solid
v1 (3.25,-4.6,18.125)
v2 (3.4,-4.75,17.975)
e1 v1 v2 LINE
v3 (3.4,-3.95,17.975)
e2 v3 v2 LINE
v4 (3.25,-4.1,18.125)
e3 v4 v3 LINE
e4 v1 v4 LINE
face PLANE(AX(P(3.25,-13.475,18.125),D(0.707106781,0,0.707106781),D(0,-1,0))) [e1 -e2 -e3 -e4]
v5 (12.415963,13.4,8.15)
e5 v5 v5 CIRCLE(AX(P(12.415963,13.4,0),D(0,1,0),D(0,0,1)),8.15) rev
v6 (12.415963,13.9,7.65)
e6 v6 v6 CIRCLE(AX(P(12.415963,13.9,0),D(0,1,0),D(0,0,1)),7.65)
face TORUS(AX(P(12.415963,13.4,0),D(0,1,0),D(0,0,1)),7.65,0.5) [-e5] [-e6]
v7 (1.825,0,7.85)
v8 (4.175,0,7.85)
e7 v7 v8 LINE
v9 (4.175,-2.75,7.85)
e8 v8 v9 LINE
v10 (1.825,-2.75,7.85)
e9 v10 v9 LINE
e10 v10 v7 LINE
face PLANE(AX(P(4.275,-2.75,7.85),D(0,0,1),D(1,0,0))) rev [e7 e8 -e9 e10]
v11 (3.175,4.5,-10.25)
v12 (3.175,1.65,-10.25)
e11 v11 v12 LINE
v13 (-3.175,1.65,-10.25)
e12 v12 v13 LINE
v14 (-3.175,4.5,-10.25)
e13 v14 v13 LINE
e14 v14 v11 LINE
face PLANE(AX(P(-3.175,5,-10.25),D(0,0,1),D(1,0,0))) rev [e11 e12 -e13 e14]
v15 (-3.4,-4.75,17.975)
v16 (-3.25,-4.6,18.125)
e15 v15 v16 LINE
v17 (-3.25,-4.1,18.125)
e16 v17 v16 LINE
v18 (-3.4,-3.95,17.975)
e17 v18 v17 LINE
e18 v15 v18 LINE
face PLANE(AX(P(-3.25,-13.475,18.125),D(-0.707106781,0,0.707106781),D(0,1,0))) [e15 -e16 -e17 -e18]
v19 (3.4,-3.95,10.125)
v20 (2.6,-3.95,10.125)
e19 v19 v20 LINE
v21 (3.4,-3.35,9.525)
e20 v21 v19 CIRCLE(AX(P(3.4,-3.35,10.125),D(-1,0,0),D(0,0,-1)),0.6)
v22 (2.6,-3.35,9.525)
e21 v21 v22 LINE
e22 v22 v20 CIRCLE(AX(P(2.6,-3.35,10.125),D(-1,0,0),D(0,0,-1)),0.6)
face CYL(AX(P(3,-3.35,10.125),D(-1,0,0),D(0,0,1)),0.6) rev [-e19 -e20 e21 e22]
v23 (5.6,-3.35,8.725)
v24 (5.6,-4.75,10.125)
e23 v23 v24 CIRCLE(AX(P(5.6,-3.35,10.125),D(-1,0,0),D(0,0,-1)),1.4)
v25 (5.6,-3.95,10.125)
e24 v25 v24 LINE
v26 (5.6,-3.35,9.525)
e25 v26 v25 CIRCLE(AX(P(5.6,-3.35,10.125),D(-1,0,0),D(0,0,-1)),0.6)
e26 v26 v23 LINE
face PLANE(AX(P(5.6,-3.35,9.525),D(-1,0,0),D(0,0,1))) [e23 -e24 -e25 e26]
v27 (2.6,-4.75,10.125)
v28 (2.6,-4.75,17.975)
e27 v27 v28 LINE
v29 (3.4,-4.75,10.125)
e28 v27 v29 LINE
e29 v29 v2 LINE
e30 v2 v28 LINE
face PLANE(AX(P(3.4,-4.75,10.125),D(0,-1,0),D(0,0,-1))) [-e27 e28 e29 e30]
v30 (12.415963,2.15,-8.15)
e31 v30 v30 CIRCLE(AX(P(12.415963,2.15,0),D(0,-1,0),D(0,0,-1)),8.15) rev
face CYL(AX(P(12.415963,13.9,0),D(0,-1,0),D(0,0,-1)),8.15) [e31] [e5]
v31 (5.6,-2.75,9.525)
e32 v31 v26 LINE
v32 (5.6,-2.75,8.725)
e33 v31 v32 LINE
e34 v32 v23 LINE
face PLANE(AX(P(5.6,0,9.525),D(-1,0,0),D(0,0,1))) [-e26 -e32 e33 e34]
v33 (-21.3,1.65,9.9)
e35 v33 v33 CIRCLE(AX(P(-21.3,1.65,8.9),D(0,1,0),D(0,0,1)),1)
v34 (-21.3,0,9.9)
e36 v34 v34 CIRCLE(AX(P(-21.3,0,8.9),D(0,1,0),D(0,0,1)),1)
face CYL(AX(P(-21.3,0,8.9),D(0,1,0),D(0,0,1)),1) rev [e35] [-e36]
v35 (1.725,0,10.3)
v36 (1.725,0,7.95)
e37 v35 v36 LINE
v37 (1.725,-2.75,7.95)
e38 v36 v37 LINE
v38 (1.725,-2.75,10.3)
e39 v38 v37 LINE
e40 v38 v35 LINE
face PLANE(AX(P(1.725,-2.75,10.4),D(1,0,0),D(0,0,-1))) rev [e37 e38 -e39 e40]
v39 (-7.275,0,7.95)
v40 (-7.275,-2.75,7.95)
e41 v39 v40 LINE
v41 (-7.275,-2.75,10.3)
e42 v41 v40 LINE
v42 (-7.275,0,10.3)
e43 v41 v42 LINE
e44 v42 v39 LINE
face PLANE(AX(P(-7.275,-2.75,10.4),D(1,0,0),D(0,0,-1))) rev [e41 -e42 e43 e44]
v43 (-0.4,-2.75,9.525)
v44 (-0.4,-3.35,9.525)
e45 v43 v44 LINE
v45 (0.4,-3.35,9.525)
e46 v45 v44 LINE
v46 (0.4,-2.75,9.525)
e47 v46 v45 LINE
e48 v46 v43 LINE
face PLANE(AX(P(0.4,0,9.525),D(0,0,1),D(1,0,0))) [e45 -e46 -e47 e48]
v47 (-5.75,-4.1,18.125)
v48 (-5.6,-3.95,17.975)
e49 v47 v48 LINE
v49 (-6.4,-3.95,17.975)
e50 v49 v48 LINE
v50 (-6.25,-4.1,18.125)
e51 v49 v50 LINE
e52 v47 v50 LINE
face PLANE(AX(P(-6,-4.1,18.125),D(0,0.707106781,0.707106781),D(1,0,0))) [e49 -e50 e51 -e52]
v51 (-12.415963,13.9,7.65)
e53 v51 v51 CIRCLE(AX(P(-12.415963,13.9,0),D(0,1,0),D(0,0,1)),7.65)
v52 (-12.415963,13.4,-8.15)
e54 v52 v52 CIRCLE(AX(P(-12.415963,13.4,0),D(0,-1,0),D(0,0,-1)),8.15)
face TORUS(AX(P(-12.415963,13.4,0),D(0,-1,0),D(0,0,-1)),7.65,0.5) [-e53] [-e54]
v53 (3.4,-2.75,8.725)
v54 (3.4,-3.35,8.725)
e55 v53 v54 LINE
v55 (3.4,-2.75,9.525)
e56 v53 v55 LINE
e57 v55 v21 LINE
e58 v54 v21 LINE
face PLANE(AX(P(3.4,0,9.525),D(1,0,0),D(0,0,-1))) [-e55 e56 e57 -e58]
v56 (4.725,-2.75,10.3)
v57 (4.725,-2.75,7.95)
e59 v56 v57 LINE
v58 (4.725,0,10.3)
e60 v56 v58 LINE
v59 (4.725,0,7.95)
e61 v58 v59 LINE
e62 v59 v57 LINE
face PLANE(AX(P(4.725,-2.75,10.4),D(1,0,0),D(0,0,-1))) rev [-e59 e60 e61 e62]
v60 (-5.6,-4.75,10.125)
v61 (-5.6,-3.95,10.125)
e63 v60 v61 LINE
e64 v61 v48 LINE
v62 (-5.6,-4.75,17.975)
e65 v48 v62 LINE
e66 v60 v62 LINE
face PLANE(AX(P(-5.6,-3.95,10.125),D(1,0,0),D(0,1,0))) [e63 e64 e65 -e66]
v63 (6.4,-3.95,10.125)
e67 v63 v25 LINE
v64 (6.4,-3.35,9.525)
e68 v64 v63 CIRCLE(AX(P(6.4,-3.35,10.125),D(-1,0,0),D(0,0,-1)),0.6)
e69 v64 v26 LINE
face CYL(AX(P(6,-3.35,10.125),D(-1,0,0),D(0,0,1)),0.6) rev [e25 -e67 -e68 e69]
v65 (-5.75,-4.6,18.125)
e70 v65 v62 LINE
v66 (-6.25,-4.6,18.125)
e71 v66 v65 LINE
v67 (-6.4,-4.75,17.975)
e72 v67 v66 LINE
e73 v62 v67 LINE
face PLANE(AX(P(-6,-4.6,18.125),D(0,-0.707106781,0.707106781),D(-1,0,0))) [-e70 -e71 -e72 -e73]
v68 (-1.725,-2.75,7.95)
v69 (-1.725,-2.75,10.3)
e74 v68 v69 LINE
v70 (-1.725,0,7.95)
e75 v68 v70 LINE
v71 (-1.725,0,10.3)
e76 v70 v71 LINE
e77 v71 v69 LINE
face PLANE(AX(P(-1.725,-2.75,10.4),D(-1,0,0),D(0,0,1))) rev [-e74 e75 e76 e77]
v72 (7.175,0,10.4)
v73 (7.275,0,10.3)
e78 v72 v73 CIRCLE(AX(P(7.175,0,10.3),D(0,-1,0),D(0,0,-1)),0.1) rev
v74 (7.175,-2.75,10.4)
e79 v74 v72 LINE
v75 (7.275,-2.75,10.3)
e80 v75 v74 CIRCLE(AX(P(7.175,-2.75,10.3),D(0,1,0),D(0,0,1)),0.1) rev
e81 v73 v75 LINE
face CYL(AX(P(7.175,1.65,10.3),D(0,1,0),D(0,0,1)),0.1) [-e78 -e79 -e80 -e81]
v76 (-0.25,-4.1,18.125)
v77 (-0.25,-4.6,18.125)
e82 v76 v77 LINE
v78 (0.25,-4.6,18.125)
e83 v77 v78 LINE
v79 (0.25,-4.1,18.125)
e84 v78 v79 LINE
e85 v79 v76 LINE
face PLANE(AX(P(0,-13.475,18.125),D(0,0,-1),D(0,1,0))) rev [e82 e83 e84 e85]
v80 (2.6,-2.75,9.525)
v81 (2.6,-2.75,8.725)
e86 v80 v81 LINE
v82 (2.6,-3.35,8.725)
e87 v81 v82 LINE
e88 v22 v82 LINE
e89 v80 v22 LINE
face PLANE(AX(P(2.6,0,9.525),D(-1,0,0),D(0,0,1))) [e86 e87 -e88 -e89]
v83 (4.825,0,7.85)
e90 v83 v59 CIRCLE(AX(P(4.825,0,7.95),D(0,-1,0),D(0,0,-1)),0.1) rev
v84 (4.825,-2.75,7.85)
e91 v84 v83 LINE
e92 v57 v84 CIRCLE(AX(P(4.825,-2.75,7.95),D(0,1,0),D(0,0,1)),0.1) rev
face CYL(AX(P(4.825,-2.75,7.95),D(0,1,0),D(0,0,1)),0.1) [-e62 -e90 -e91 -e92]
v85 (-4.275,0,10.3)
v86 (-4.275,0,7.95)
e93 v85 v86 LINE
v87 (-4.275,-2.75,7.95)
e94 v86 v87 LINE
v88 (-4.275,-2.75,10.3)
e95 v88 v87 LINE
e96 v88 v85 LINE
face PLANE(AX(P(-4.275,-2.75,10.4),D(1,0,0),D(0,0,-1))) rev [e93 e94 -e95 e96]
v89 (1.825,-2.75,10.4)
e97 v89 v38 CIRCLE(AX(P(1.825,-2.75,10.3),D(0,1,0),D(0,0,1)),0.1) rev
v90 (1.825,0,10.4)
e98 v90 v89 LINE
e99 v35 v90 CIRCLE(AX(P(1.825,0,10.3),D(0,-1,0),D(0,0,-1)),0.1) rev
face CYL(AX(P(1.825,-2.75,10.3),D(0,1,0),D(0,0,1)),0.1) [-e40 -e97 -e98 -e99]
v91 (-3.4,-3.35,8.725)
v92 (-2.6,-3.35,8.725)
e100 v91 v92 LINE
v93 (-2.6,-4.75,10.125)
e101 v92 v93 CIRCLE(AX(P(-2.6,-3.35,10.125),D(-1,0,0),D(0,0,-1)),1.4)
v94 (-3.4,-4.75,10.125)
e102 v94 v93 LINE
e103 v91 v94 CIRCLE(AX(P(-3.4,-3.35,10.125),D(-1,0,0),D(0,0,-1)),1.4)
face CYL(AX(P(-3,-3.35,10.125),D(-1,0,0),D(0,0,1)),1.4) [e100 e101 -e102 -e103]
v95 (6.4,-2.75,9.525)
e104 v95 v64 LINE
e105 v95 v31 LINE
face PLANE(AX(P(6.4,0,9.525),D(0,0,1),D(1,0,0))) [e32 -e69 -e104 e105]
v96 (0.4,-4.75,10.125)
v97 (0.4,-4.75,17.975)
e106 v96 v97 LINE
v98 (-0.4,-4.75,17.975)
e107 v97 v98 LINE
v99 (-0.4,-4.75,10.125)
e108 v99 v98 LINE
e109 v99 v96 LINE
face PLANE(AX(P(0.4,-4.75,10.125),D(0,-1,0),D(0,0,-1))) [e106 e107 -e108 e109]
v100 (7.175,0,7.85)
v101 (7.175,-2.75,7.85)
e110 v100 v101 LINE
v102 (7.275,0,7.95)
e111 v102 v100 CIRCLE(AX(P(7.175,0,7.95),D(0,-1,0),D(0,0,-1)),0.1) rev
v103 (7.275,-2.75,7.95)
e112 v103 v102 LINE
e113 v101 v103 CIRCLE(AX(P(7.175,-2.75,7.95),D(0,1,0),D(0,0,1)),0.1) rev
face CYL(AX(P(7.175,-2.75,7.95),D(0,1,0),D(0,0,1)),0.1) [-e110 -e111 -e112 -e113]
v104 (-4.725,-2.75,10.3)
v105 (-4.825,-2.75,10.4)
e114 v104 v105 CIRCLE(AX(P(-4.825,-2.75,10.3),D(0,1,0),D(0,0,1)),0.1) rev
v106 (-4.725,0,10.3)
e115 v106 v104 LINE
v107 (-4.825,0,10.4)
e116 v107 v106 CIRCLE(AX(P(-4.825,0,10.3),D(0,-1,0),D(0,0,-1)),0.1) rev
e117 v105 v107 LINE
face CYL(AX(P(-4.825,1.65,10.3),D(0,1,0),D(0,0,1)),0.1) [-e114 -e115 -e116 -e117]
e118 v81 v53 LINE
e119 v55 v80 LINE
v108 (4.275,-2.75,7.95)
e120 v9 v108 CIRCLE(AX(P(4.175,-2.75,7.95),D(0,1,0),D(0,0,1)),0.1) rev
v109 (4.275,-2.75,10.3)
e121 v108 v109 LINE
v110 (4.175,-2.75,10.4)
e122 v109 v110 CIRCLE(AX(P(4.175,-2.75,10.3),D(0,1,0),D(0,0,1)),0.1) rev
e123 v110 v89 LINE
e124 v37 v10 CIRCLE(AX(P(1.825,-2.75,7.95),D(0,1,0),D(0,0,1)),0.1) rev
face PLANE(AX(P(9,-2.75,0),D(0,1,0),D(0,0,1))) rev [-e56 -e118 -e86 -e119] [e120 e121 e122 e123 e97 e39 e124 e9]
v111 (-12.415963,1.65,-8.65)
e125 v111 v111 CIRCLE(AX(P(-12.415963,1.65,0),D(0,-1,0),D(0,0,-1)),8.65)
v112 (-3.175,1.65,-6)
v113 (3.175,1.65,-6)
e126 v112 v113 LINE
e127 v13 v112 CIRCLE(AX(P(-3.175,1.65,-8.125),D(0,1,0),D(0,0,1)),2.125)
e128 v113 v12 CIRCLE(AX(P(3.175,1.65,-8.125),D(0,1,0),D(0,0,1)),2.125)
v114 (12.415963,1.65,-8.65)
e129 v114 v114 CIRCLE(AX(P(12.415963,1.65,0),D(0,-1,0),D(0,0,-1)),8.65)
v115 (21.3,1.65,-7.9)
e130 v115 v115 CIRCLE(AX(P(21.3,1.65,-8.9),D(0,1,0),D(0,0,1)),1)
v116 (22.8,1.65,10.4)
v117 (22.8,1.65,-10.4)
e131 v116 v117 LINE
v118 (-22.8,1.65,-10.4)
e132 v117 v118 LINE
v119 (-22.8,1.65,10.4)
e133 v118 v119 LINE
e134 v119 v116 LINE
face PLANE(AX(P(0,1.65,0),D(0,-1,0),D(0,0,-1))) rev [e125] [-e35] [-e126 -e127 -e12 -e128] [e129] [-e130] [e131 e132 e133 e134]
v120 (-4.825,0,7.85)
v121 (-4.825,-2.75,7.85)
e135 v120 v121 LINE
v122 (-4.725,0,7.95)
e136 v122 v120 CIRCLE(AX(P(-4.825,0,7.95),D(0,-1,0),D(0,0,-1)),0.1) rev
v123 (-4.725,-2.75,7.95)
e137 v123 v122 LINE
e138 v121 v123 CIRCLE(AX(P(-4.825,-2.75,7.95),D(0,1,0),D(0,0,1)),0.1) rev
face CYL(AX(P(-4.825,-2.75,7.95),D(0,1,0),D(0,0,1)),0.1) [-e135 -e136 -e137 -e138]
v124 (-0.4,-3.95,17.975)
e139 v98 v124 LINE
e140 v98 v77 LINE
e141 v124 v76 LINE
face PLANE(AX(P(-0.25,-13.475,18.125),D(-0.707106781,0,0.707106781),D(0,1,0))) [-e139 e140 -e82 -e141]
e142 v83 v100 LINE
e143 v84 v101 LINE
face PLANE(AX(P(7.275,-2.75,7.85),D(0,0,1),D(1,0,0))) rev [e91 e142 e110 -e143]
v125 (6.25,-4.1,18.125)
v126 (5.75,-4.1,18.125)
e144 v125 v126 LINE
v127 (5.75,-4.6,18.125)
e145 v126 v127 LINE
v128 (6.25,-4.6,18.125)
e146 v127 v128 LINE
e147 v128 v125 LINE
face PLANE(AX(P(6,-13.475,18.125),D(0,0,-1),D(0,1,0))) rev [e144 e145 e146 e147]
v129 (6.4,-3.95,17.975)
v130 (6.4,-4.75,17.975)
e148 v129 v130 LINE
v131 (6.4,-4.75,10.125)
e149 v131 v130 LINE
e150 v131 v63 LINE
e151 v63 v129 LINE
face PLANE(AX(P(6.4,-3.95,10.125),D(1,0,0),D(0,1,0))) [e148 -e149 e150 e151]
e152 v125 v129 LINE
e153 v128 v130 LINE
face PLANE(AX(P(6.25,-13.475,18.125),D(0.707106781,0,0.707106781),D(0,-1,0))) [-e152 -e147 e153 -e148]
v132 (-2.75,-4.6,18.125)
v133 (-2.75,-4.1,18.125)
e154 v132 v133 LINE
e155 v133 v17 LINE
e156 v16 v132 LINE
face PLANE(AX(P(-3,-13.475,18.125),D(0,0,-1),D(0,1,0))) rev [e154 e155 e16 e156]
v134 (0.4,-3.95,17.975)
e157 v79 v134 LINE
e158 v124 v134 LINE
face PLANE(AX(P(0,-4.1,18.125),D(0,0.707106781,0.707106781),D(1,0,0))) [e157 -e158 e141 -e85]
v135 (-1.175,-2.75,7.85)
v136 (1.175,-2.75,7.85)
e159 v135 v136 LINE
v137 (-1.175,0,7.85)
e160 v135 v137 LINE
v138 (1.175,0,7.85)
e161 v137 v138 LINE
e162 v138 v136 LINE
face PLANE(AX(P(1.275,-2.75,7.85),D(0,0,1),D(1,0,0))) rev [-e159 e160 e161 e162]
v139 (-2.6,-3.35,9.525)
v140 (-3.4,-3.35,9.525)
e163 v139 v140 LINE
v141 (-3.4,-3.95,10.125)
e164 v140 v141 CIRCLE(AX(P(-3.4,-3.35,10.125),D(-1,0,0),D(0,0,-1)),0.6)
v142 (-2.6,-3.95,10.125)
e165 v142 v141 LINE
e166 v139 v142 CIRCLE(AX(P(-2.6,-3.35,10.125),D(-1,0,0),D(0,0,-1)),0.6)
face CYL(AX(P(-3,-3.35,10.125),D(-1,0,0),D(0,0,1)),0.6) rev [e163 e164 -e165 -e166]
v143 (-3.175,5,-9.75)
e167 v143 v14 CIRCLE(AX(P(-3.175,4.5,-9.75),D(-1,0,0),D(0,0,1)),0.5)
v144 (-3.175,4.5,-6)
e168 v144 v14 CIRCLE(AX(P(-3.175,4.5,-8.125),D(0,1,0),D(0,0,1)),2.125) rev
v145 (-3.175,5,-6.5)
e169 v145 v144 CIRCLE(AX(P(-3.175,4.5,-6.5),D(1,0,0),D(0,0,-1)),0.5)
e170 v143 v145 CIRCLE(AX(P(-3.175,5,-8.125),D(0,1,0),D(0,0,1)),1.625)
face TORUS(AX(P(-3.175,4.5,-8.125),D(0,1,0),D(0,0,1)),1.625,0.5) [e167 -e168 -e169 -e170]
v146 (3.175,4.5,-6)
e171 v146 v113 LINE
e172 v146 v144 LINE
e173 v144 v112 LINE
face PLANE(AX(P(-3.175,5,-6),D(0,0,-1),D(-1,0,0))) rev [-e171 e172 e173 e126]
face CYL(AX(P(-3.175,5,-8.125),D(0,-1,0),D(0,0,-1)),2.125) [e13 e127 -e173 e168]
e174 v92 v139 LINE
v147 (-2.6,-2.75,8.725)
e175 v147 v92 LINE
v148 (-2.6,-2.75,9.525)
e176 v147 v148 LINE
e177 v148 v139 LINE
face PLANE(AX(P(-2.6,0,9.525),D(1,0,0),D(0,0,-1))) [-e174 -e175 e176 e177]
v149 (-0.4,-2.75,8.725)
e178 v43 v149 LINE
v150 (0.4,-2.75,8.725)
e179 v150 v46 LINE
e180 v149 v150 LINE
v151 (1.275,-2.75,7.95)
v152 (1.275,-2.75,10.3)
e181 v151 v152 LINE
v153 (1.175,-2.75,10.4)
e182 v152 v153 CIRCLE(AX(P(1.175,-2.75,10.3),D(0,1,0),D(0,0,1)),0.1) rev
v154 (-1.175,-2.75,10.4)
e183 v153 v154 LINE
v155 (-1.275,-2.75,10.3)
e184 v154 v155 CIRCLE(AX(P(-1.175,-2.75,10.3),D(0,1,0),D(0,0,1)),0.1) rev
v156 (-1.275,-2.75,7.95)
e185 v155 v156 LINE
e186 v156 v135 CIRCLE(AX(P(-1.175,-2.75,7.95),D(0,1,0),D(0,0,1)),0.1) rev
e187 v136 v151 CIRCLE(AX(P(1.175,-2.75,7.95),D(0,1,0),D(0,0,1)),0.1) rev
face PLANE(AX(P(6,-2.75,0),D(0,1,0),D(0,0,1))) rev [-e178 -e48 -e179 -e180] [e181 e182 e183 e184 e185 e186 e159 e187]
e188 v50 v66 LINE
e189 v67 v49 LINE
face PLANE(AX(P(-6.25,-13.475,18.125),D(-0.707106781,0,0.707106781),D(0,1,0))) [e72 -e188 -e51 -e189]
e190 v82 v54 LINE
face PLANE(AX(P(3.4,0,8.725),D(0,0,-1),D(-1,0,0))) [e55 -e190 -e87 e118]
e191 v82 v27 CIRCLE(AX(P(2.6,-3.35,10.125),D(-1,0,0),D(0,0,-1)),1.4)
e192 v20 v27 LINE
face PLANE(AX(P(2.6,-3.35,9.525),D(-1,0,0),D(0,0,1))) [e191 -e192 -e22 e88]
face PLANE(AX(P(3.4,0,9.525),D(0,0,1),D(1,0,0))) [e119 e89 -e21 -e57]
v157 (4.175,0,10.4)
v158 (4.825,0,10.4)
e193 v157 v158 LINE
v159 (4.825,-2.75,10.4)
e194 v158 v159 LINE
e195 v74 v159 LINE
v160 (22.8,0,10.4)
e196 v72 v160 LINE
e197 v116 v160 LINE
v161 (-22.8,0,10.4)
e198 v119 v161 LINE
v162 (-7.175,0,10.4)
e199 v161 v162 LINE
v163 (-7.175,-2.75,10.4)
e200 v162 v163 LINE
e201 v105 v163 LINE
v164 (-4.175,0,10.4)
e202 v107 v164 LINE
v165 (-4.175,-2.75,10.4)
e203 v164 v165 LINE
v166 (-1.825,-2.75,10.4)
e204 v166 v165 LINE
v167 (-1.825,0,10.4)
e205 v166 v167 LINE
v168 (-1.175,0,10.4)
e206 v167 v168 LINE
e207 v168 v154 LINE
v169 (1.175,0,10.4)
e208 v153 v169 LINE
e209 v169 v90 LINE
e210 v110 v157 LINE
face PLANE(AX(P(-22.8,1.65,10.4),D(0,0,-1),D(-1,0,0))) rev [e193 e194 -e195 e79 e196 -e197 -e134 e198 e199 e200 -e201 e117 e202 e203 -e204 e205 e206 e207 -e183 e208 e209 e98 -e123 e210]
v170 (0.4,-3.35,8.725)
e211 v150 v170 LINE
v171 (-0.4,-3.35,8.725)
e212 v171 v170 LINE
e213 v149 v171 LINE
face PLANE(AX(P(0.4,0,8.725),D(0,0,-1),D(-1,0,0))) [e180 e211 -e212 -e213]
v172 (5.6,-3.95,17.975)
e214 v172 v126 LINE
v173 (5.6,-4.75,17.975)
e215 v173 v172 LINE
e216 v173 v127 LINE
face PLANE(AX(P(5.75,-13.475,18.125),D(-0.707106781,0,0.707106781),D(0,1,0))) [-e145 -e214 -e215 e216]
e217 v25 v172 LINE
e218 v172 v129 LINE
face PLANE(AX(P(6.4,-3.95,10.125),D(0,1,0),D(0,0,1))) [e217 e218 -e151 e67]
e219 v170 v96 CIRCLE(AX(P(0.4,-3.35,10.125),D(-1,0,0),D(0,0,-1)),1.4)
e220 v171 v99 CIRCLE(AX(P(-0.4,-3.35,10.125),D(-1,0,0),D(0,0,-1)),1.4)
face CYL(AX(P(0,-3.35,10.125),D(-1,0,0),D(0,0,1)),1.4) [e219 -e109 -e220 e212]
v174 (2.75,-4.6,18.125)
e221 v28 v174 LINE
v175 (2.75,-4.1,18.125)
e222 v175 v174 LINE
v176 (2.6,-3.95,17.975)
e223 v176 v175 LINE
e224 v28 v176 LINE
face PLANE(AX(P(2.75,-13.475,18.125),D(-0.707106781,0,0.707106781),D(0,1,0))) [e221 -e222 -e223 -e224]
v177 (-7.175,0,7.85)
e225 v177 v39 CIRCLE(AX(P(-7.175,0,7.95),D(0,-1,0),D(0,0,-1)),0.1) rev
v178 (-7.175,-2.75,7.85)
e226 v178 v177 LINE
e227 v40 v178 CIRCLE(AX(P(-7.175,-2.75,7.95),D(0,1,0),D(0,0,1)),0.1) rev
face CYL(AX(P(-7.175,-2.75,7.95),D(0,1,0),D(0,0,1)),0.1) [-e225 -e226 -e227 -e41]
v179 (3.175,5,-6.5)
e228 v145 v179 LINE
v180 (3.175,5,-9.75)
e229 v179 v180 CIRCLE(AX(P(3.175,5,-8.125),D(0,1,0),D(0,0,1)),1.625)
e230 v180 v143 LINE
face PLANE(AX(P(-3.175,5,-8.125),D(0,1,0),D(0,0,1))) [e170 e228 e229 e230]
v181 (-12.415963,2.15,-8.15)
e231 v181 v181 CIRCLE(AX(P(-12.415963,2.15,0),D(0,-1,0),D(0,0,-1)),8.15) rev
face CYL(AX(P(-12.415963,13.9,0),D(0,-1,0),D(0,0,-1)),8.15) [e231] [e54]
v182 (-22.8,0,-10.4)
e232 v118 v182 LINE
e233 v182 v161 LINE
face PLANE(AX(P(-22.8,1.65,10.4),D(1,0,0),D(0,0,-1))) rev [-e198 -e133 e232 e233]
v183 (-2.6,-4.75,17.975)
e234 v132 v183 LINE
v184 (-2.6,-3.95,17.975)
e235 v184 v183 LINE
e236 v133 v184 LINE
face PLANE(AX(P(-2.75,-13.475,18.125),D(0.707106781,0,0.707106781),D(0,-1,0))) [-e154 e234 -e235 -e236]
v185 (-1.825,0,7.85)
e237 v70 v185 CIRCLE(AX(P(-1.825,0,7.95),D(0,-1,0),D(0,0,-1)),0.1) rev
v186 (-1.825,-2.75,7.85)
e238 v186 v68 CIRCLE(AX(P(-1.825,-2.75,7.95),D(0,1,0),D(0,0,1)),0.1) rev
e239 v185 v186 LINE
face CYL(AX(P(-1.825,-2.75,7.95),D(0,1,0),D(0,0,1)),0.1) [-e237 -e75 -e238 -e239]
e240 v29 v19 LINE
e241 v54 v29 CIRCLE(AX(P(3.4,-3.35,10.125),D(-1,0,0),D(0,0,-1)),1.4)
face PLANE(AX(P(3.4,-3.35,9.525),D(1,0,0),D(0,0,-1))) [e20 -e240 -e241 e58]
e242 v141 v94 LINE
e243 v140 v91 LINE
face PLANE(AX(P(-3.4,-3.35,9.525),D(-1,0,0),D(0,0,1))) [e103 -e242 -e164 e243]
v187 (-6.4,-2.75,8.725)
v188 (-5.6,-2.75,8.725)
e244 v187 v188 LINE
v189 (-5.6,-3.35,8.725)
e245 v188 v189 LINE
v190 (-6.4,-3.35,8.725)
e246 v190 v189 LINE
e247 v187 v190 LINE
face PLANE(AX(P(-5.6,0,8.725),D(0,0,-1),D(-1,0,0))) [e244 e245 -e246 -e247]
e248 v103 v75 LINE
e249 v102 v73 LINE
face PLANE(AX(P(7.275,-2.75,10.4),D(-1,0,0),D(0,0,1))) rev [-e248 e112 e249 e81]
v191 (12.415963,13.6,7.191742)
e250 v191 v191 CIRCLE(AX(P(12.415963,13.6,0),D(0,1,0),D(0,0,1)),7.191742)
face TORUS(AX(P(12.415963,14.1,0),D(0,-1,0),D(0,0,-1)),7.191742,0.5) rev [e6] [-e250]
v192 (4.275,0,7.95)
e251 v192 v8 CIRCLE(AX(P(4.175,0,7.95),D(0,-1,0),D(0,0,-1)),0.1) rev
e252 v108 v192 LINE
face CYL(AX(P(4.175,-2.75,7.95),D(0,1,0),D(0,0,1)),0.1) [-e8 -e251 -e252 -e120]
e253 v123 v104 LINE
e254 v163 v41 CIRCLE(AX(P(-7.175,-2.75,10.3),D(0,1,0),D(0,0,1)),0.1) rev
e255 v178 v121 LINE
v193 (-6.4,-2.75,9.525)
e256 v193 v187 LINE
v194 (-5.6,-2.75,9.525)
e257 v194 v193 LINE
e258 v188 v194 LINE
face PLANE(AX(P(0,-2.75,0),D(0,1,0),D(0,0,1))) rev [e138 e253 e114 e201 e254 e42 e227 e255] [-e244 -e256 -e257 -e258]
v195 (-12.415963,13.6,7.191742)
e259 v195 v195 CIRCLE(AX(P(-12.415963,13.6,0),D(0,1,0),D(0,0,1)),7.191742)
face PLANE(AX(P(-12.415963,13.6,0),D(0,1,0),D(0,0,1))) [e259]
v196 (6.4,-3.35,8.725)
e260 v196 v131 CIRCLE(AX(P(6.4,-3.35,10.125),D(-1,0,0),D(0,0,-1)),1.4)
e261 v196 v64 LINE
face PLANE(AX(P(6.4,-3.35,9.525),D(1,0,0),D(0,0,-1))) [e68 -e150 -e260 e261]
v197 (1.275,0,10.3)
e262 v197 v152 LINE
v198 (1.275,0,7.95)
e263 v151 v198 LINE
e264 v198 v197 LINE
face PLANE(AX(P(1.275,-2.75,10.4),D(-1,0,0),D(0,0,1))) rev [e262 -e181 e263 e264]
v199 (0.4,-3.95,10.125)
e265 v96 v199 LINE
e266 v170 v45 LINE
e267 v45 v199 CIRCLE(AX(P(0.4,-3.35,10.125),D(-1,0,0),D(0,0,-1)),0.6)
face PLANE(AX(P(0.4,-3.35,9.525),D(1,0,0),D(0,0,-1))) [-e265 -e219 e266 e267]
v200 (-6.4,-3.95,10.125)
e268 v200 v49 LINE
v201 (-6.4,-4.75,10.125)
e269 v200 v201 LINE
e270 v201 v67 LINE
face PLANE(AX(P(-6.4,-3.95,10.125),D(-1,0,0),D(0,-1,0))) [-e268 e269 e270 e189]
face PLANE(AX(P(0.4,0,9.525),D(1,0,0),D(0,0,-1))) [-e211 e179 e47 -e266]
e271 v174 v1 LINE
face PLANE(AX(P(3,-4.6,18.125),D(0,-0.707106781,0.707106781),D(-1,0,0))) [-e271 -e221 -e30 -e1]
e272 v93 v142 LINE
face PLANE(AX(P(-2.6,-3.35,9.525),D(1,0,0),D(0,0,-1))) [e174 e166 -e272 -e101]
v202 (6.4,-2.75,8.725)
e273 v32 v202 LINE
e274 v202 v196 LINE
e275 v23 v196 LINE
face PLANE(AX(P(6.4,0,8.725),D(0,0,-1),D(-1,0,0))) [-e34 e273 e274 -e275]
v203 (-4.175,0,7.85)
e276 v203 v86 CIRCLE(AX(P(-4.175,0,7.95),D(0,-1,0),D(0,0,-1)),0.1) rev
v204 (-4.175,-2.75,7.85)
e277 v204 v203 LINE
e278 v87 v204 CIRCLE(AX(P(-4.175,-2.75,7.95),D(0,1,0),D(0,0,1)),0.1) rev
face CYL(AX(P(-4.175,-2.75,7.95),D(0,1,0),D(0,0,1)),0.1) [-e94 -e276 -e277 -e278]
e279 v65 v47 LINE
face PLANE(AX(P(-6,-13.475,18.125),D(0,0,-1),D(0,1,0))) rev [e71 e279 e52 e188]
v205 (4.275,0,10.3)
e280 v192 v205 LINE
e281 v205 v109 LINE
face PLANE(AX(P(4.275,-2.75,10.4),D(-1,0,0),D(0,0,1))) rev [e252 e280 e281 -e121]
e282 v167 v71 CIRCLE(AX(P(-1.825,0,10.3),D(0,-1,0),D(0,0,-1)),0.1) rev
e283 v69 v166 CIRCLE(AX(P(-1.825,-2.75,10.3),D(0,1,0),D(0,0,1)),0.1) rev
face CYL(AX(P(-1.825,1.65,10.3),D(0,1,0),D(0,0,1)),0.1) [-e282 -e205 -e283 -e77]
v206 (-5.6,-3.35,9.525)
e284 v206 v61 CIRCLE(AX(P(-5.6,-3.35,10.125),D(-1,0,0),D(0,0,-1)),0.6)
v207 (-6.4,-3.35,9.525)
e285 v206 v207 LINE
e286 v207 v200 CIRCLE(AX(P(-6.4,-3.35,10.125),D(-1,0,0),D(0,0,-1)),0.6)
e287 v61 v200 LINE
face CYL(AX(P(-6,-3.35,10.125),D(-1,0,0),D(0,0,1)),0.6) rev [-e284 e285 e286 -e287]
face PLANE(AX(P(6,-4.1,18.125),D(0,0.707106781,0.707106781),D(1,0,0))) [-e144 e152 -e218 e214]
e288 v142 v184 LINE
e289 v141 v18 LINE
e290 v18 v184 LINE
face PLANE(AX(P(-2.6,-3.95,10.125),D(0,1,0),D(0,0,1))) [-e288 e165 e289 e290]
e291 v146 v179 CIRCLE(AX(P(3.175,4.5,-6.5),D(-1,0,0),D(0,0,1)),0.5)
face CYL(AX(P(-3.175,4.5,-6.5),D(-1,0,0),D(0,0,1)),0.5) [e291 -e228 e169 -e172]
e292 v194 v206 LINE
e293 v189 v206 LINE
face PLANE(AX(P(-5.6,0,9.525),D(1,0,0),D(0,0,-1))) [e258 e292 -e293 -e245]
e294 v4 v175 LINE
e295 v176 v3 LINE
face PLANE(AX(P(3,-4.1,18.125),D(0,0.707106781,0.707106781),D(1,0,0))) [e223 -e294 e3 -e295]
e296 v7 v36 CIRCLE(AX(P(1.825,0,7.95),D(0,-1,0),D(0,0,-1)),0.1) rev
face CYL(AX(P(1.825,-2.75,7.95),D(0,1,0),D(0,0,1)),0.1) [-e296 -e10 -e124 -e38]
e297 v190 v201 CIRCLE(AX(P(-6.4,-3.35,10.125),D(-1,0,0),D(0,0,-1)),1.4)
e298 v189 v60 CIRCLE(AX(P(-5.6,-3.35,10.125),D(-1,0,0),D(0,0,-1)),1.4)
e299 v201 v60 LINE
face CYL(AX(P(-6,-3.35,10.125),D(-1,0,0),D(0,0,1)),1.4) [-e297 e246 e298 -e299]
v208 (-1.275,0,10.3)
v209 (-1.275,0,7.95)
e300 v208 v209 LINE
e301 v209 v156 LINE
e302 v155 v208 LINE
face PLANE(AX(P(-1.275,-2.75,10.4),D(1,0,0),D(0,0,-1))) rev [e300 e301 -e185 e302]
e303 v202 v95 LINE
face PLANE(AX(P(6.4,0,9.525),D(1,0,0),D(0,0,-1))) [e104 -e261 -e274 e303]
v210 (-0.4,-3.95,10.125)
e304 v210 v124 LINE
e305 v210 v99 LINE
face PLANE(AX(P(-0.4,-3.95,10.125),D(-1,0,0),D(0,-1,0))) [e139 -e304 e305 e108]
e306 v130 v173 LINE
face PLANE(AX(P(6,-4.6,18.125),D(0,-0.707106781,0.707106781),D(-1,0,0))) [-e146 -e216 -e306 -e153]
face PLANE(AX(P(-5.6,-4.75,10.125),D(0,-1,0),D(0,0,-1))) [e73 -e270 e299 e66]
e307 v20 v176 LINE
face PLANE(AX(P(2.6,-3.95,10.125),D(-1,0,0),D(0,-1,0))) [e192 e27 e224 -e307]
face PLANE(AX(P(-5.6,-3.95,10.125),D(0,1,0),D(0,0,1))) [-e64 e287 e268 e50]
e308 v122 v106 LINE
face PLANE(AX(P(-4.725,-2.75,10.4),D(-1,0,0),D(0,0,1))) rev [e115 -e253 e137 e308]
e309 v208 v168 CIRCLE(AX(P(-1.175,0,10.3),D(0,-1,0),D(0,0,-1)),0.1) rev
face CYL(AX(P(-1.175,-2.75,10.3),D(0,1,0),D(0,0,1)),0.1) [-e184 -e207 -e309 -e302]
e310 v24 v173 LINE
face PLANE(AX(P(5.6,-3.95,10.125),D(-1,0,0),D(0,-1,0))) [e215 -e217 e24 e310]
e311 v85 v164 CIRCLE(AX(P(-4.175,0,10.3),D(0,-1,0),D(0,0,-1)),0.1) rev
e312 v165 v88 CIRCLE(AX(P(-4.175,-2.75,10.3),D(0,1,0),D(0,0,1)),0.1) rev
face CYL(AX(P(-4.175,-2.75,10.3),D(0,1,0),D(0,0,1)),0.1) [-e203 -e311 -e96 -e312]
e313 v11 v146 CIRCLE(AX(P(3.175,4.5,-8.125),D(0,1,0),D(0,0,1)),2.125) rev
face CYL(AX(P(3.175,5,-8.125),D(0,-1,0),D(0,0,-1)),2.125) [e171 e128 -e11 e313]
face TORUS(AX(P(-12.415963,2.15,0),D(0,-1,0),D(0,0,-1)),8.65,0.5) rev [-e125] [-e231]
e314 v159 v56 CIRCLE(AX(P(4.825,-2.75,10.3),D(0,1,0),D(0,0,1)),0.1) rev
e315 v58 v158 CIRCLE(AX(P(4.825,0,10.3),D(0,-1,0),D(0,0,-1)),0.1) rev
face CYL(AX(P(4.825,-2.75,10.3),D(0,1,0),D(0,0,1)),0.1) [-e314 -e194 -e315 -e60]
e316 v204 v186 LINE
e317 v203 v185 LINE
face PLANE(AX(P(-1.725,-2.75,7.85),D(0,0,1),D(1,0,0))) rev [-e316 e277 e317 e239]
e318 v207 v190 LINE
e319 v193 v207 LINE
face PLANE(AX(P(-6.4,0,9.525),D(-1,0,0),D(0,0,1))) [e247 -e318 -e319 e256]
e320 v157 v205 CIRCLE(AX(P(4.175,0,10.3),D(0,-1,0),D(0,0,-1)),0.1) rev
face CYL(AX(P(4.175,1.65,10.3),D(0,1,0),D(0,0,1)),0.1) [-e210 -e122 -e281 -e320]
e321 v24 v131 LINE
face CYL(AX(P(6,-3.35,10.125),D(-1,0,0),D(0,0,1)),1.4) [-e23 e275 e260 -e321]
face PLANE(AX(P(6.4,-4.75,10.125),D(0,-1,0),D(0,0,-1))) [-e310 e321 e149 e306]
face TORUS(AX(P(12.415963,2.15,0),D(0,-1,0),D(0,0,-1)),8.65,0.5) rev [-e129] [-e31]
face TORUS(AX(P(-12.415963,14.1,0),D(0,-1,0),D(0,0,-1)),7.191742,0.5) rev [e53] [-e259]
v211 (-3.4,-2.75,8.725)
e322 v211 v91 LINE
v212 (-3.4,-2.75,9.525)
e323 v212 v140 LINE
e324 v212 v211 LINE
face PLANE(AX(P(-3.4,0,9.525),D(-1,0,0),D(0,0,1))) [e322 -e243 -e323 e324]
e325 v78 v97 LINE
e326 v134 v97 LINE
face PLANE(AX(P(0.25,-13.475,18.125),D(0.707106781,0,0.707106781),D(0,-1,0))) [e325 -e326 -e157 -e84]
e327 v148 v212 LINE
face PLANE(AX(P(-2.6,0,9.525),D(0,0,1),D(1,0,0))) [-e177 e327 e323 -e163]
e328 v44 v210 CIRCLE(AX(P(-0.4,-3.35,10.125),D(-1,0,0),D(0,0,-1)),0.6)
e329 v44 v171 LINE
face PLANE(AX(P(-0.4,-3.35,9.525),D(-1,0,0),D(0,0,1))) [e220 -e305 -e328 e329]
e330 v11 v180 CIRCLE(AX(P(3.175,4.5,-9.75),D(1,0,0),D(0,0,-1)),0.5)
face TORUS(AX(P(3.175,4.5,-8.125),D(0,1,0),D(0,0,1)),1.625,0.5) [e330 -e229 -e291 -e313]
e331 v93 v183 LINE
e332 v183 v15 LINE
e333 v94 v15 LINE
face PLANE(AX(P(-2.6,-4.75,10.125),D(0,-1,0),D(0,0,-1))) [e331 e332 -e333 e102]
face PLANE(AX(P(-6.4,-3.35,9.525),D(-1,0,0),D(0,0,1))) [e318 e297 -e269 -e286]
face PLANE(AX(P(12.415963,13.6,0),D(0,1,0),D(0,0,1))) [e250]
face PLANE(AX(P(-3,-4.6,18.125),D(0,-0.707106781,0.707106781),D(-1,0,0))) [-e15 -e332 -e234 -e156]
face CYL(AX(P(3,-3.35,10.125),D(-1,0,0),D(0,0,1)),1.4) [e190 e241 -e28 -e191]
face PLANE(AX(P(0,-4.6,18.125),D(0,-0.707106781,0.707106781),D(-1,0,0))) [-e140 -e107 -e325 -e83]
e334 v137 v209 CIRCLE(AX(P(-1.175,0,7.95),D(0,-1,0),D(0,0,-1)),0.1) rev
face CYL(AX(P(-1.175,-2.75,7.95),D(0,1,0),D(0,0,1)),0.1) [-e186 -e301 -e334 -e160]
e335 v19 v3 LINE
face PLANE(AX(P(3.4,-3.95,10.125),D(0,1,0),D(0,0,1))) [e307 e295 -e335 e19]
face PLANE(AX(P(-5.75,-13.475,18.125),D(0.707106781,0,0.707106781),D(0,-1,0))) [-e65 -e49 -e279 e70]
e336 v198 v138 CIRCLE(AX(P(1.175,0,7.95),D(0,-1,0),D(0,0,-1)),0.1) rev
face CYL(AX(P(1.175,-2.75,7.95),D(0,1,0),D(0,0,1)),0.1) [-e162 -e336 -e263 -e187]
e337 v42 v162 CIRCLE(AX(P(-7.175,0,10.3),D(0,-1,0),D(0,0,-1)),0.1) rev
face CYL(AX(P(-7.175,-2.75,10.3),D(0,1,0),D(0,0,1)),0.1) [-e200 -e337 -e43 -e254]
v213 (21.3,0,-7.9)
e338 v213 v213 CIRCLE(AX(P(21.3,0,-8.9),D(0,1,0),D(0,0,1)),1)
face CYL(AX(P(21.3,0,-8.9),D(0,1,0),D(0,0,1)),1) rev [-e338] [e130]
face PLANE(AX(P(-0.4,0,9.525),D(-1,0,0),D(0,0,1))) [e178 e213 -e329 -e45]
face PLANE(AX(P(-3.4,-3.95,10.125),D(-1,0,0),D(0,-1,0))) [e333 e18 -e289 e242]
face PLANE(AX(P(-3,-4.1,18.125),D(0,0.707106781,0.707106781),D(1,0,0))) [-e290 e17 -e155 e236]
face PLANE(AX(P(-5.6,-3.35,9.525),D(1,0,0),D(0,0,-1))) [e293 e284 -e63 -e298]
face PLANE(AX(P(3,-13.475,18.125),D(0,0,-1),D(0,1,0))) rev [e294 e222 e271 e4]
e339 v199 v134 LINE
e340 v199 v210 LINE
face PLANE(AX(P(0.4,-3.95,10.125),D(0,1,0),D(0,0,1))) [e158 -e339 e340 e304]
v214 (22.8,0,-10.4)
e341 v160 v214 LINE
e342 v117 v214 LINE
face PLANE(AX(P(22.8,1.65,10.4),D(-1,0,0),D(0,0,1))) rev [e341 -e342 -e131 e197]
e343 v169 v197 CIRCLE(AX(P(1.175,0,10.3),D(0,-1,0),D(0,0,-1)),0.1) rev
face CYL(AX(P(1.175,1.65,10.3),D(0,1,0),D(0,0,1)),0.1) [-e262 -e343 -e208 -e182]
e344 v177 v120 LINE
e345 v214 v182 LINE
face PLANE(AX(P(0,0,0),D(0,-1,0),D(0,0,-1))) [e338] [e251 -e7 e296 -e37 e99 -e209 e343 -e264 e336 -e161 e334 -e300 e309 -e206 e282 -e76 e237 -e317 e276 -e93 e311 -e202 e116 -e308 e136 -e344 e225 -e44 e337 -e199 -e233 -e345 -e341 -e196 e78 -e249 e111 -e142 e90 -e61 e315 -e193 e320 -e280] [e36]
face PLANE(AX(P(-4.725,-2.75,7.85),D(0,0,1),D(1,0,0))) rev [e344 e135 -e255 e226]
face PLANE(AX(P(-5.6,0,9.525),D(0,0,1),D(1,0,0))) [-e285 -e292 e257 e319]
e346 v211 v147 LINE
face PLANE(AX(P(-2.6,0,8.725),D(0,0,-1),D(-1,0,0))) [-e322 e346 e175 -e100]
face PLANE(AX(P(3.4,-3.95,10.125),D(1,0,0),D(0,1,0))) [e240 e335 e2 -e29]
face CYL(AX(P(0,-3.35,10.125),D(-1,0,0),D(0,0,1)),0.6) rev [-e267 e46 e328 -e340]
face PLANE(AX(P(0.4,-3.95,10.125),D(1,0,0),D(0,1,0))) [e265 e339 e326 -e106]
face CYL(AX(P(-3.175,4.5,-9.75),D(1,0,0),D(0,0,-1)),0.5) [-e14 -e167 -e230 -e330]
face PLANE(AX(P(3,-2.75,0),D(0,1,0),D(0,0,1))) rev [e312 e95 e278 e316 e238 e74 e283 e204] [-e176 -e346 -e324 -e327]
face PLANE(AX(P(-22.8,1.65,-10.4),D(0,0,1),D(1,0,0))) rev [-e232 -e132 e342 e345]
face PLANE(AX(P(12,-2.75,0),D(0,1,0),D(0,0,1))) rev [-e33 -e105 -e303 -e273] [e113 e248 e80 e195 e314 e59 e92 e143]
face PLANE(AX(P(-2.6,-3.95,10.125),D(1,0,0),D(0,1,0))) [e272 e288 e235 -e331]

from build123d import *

# Parameters (mm, degrees)
SKETCH1_W                  = 45.6
SKETCH1_H                  = 20.8
BOSS_EXTRUDE1_DEPTH        = 1.65
BOSS_EXTRUDE2_DEPTH        = 3.35
FILLET1_R                  = 0.5
SKETCH4_R                  = 8.15
BOSS_EXTRUDE3_DEPTH        = 12.25
FILLET2_R                  = 0.5
SKETCH6_R                  = 7.65
CUT_EXTRUDE1_DEPTH         = 0.3
FILLET3_R                  = 0.5
SKETCH7_R                  = 1
CUT_EXTRUDE2_DEPTH         = 28.893771706
SKETCH9_W                  = 0.8
SKETCH9_H                  = 0.8
CHAMFER1_SIZE              = 0.15
LPATTERN3_COUNT            = 3
LPATTERN3_PITCH            = 3
CHAMFER1_OF_LPATTERN3_SIZE = 0.15
LPATTERN4_COUNT            = 3
LPATTERN4_PITCH            = 3
CHAMFER1_OF_LPATTERN4_SIZE = 0.15
SKETCH10_W                 = 2.55
SKETCH10_H                 = 2.55
BOSS_EXTRUDE4_DEPTH        = 2.75
FILLET4_R                  = 0.1
LPATTERN5_COUNT            = 5
LPATTERN5_PITCH            = 3
FILLET4_OF_LPATTERN5_R     = 0.1


with BuildPart() as part:
    # Sketch1 → Boss-Extrude1 (new body)
    with BuildSketch(Plane(origin=(0, 0, 0), x_dir=(1, 0, 0), z_dir=(0, 1, 0))):
        Rectangle(SKETCH1_W, SKETCH1_H)
    extrude(amount=BOSS_EXTRUDE1_DEPTH)

    # Sketch2 → Boss-Extrude2 (add)
    with BuildSketch(Plane(origin=(0, 1.65, 0), x_dir=(1, 0, 0), z_dir=(0, 1, 0))):
        with BuildLine():
            Line((-3.175, 10.25), (3.175, 10.25))
            ThreePointArc((3.175, 10.25), (5.3, 8.125), (3.175, 6))
            Line((3.175, 6), (-3.175, 6))
            ThreePointArc((-3.175, 6), (-5.3, 8.125), (-3.175, 10.25))
        make_face()
    extrude(amount=BOSS_EXTRUDE2_DEPTH)

    # Fillet1
    fillet1_edges = [part.edges().sort_by_distance(p)[0] for p in [
        (-5.3, 5, -8.125),
        (0, 5, -6),
        (5.3, 5, -8.125),
        (0, 5, -10.25),
    ]]
    fillet(fillet1_edges, radius=FILLET1_R)

    # Sketch4 → Boss-Extrude3 (add)
    with BuildSketch(Plane(origin=(0, 1.65, 0), x_dir=(1, 0, 0), z_dir=(0, 1, 0))):
        with Locations(Location((12.415962636, 0, 0), (0, 0, 90))):
            Circle(SKETCH4_R)
        with Locations(Location((-12.415962636, 0, 0), (0, 0, 90))):
            Circle(SKETCH4_R)
    extrude(amount=BOSS_EXTRUDE3_DEPTH)

    # Fillet2
    fillet2_edges = [part.edges().sort_by_distance(p)[0] for p in [
        (12.415962636, 1.65, 8.15),
        (12.415962636, 13.9, 8.15),
        (-12.415962636, 1.65, 8.15),
        (-12.415962636, 13.9, 8.15),
    ]]
    fillet(fillet2_edges, radius=FILLET2_R)

    # Sketch6 → Cut-Extrude1 (cut)
    with BuildSketch(Plane(origin=(0, 13.9, 0), x_dir=(1, 0, 0), z_dir=(0, 1, 0))):
        with Locations(Location((12.415962636, 0, 0), (0, 0, 270))):
            Circle(SKETCH6_R)
        with Locations(Location((-12.415962636, 0, 0), (0, 0, 270))):
            Circle(SKETCH6_R)
    extrude(amount=-CUT_EXTRUDE1_DEPTH, mode=Mode.SUBTRACT)

    # Fillet3
    # the kernel refuses this fillet: 0.5 mm, written as the material it adds along each edge
    with BuildSketch(Plane(origin=(12.415962636, 13.6, 0), x_dir=(0, 0, 1), z_dir=(-1, 0, 0))) as fillet3_piece_1:
        with BuildLine():
            CenterArc((7.191742431, 0.5), FILLET3_R, 270, 66.421821522)
            Line((7.191742431, 0), (7.191742431, -0.01))
            Line((7.191742431, -0.01), (7.65, -0.01))
            Line((7.65, -0.01), (7.66, 0))
            ThreePointArc((7.66, 0), (7.66, 0.15), (7.659165151, 0.296))
            Line((7.659165151, 0.296), (7.65, 0.3))
        make_face()
    revolve(axis=Axis((12.415962636, 13.6, 0), (0, 1, 0)), revolution_arc=179.999999776)
    with BuildSketch(Plane(origin=(12.415962636, 13.6, 0), x_dir=(3.90111484147698e-09, 0, -1.0), z_dir=(1.0, 0, 3.90111484147698e-09))) as fillet3_piece_2:
        with BuildLine():
            CenterArc((7.191742431, 0.5), FILLET3_R, 270, 66.421821522)
            Line((7.191742431, 0), (7.191742431, -0.01))
            Line((7.191742431, -0.01), (7.65, -0.01))
            Line((7.65, -0.01), (7.66, 0))
            ThreePointArc((7.66, 0), (7.66, 0.15), (7.659165151, 0.296))
            Line((7.659165151, 0.296), (7.65, 0.3))
        make_face()
    revolve(axis=Axis((12.415962636, 13.6, 0), (0, 1, 0)), revolution_arc=180.000000224)
    with BuildSketch(Plane(origin=(-12.415962636, 13.6, 0), x_dir=(0, 0, 1), z_dir=(-1, 0, 0))) as fillet3_piece_3:
        with BuildLine():
            CenterArc((7.191742431, 0.5), FILLET3_R, 270, 66.421821522)
            Line((7.191742431, 0), (7.191742431, -0.01))
            Line((7.191742431, -0.01), (7.65, -0.01))
            Line((7.65, -0.01), (7.66, 0))
            ThreePointArc((7.66, 0), (7.66, 0.15), (7.659165151, 0.296))
            Line((7.659165151, 0.296), (7.65, 0.3))
        make_face()
    revolve(axis=Axis((-12.415962636, 13.6, 0), (0, 1, 0)), revolution_arc=179.999999776)
    with BuildSketch(Plane(origin=(-12.415962636, 13.6, 0), x_dir=(3.901114841476977e-09, 0, -1.0), z_dir=(1.0, 0, 3.901114841476977e-09))) as fillet3_piece_4:
        with BuildLine():
            CenterArc((7.191742431, 0.5), FILLET3_R, 270, 66.421821522)
            Line((7.191742431, 0), (7.191742431, -0.01))
            Line((7.191742431, -0.01), (7.65, -0.01))
            Line((7.65, -0.01), (7.66, 0))
            ThreePointArc((7.66, 0), (7.66, 0.15), (7.659165151, 0.296))
            Line((7.659165151, 0.296), (7.65, 0.3))
        make_face()
    revolve(axis=Axis((-12.415962636, 13.6, 0), (0, 1, 0)), revolution_arc=180.000000224)

    # Sketch7 → Cut-Extrude2 (cut, through all)
    with BuildSketch(Plane(origin=(0, 1.65, 0), x_dir=(1, 0, 0), z_dir=(0, 1, 0))):
        with Locations(Location((-21.3, -8.9, 0), (0, 0, 270))):
            Circle(SKETCH7_R)
        with Locations(Location((21.3, 8.9, 0), (0, 0, 270))):
            Circle(SKETCH7_R)
    extrude(amount=-CUT_EXTRUDE2_DEPTH, mode=Mode.SUBTRACT)

    # Sweep1: sweep along a path in Sketch8
    with BuildLine(Plane(origin=(0, 0, 0), x_dir=(0, 0, -1), z_dir=(1, 0, 0))) as sweep1_path:
        Line((-9.125, 0), (-9.125, -3.35))
        ThreePointArc((-9.125, -3.35), (-9.417893219, -4.057106781), (-10.125, -4.35))
        Line((-10.125, -4.35), (-18.125, -4.35))
    # Sketch9 → Sweep1 (sweep)
    with BuildSketch(Plane.XZ):
        with Locations((0, 9.125)):
            Rectangle(SKETCH9_W, SKETCH9_H)
    sweep1 = sweep(path=sweep1_path.line)

    # Chamfer1
    chamfer1_edges = [part.edges().sort_by_distance(p)[0] for p in [
        (-0.4, -4.35, 18.125),
        (0, -4.75, 18.125),
        (0.4, -4.35, 18.125),
        (0, -3.95, 18.125),
    ]]
    chamfer(chamfer1_edges, length=CHAMFER1_SIZE)

    # LPattern3: Sweep1 ×3
    with Locations(*[(-i * LPATTERN3_PITCH, 0, 0) for i in range(1, LPATTERN3_COUNT)]):
        add(sweep1)

    # Chamfer1 of LPattern3
    chamfer1_of_lpattern3_edges = [part.edges().sort_by_distance(p)[0] for p in [
        (-3.4, -4.35, 18.125),
        (-3, -4.75, 18.125),
        (-2.6, -4.35, 18.125),
        (-3, -3.95, 18.125),
        (-6.4, -4.35, 18.125),
        (-6, -4.75, 18.125),
        (-5.6, -4.35, 18.125),
        (-6, -3.95, 18.125),
    ]]
    chamfer(chamfer1_of_lpattern3_edges, length=CHAMFER1_OF_LPATTERN3_SIZE)

    # LPattern4: Sweep1 ×3
    with Locations(*[(i * LPATTERN4_PITCH, 0, 0) for i in range(1, LPATTERN4_COUNT)]):
        add(sweep1)

    # Chamfer1 of LPattern4
    chamfer1_of_lpattern4_edges = [part.edges().sort_by_distance(p)[0] for p in [
        (2.6, -4.35, 18.125),
        (3, -4.75, 18.125),
        (3.4, -4.35, 18.125),
        (3, -3.95, 18.125),
        (5.6, -4.35, 18.125),
        (6, -4.75, 18.125),
        (6.4, -4.35, 18.125),
        (6, -3.95, 18.125),
    ]]
    chamfer(chamfer1_of_lpattern4_edges, length=CHAMFER1_OF_LPATTERN4_SIZE)

    # Sketch10 → Boss-Extrude4 (add)
    with BuildSketch(Plane.XZ):
        with Locations((-6, 9.125)):
            Rectangle(SKETCH10_W, SKETCH10_H)
    boss_extrude4 = extrude(amount=BOSS_EXTRUDE4_DEPTH)

    # Fillet4
    fillet4_edges = [part.edges().sort_by_distance(p)[0] for p in [
        (-7.275, -1.375, 10.4),
        (-7.275, -1.375, 7.85),
        (-4.725, -1.375, 7.85),
        (-4.725, -1.375, 10.4),
    ]]
    fillet(fillet4_edges, radius=FILLET4_R)

    # LPattern5: Boss-Extrude4 ×5
    with Locations(*[(i * LPATTERN5_PITCH, 0, 0) for i in range(1, LPATTERN5_COUNT)]):
        add(boss_extrude4)

    # Fillet4 of LPattern5
    fillet4_of_lpattern5_edges = [part.edges().sort_by_distance(p)[0] for p in [
        (-4.275, -1.375, 10.4),
        (-4.275, -1.375, 7.85),
        (-1.725, -1.375, 7.85),
        (-1.725, -1.375, 10.4),
        (-1.275, -1.375, 10.4),
        (-1.275, -1.375, 7.85),
        (1.275, -1.375, 7.85),
        (1.275, -1.375, 10.4),
        (1.725, -1.375, 10.4),
        (1.725, -1.375, 7.85),
        (4.275, -1.375, 7.85),
        (4.275, -1.375, 10.4),
        (4.725, -1.375, 10.4),
        (4.725, -1.375, 7.85),
        (7.275, -1.375, 7.85),
        (7.275, -1.375, 10.4),
    ]]
    fillet(fillet4_of_lpattern5_edges, radius=FILLET4_OF_LPATTERN5_R)


solid = part.part
